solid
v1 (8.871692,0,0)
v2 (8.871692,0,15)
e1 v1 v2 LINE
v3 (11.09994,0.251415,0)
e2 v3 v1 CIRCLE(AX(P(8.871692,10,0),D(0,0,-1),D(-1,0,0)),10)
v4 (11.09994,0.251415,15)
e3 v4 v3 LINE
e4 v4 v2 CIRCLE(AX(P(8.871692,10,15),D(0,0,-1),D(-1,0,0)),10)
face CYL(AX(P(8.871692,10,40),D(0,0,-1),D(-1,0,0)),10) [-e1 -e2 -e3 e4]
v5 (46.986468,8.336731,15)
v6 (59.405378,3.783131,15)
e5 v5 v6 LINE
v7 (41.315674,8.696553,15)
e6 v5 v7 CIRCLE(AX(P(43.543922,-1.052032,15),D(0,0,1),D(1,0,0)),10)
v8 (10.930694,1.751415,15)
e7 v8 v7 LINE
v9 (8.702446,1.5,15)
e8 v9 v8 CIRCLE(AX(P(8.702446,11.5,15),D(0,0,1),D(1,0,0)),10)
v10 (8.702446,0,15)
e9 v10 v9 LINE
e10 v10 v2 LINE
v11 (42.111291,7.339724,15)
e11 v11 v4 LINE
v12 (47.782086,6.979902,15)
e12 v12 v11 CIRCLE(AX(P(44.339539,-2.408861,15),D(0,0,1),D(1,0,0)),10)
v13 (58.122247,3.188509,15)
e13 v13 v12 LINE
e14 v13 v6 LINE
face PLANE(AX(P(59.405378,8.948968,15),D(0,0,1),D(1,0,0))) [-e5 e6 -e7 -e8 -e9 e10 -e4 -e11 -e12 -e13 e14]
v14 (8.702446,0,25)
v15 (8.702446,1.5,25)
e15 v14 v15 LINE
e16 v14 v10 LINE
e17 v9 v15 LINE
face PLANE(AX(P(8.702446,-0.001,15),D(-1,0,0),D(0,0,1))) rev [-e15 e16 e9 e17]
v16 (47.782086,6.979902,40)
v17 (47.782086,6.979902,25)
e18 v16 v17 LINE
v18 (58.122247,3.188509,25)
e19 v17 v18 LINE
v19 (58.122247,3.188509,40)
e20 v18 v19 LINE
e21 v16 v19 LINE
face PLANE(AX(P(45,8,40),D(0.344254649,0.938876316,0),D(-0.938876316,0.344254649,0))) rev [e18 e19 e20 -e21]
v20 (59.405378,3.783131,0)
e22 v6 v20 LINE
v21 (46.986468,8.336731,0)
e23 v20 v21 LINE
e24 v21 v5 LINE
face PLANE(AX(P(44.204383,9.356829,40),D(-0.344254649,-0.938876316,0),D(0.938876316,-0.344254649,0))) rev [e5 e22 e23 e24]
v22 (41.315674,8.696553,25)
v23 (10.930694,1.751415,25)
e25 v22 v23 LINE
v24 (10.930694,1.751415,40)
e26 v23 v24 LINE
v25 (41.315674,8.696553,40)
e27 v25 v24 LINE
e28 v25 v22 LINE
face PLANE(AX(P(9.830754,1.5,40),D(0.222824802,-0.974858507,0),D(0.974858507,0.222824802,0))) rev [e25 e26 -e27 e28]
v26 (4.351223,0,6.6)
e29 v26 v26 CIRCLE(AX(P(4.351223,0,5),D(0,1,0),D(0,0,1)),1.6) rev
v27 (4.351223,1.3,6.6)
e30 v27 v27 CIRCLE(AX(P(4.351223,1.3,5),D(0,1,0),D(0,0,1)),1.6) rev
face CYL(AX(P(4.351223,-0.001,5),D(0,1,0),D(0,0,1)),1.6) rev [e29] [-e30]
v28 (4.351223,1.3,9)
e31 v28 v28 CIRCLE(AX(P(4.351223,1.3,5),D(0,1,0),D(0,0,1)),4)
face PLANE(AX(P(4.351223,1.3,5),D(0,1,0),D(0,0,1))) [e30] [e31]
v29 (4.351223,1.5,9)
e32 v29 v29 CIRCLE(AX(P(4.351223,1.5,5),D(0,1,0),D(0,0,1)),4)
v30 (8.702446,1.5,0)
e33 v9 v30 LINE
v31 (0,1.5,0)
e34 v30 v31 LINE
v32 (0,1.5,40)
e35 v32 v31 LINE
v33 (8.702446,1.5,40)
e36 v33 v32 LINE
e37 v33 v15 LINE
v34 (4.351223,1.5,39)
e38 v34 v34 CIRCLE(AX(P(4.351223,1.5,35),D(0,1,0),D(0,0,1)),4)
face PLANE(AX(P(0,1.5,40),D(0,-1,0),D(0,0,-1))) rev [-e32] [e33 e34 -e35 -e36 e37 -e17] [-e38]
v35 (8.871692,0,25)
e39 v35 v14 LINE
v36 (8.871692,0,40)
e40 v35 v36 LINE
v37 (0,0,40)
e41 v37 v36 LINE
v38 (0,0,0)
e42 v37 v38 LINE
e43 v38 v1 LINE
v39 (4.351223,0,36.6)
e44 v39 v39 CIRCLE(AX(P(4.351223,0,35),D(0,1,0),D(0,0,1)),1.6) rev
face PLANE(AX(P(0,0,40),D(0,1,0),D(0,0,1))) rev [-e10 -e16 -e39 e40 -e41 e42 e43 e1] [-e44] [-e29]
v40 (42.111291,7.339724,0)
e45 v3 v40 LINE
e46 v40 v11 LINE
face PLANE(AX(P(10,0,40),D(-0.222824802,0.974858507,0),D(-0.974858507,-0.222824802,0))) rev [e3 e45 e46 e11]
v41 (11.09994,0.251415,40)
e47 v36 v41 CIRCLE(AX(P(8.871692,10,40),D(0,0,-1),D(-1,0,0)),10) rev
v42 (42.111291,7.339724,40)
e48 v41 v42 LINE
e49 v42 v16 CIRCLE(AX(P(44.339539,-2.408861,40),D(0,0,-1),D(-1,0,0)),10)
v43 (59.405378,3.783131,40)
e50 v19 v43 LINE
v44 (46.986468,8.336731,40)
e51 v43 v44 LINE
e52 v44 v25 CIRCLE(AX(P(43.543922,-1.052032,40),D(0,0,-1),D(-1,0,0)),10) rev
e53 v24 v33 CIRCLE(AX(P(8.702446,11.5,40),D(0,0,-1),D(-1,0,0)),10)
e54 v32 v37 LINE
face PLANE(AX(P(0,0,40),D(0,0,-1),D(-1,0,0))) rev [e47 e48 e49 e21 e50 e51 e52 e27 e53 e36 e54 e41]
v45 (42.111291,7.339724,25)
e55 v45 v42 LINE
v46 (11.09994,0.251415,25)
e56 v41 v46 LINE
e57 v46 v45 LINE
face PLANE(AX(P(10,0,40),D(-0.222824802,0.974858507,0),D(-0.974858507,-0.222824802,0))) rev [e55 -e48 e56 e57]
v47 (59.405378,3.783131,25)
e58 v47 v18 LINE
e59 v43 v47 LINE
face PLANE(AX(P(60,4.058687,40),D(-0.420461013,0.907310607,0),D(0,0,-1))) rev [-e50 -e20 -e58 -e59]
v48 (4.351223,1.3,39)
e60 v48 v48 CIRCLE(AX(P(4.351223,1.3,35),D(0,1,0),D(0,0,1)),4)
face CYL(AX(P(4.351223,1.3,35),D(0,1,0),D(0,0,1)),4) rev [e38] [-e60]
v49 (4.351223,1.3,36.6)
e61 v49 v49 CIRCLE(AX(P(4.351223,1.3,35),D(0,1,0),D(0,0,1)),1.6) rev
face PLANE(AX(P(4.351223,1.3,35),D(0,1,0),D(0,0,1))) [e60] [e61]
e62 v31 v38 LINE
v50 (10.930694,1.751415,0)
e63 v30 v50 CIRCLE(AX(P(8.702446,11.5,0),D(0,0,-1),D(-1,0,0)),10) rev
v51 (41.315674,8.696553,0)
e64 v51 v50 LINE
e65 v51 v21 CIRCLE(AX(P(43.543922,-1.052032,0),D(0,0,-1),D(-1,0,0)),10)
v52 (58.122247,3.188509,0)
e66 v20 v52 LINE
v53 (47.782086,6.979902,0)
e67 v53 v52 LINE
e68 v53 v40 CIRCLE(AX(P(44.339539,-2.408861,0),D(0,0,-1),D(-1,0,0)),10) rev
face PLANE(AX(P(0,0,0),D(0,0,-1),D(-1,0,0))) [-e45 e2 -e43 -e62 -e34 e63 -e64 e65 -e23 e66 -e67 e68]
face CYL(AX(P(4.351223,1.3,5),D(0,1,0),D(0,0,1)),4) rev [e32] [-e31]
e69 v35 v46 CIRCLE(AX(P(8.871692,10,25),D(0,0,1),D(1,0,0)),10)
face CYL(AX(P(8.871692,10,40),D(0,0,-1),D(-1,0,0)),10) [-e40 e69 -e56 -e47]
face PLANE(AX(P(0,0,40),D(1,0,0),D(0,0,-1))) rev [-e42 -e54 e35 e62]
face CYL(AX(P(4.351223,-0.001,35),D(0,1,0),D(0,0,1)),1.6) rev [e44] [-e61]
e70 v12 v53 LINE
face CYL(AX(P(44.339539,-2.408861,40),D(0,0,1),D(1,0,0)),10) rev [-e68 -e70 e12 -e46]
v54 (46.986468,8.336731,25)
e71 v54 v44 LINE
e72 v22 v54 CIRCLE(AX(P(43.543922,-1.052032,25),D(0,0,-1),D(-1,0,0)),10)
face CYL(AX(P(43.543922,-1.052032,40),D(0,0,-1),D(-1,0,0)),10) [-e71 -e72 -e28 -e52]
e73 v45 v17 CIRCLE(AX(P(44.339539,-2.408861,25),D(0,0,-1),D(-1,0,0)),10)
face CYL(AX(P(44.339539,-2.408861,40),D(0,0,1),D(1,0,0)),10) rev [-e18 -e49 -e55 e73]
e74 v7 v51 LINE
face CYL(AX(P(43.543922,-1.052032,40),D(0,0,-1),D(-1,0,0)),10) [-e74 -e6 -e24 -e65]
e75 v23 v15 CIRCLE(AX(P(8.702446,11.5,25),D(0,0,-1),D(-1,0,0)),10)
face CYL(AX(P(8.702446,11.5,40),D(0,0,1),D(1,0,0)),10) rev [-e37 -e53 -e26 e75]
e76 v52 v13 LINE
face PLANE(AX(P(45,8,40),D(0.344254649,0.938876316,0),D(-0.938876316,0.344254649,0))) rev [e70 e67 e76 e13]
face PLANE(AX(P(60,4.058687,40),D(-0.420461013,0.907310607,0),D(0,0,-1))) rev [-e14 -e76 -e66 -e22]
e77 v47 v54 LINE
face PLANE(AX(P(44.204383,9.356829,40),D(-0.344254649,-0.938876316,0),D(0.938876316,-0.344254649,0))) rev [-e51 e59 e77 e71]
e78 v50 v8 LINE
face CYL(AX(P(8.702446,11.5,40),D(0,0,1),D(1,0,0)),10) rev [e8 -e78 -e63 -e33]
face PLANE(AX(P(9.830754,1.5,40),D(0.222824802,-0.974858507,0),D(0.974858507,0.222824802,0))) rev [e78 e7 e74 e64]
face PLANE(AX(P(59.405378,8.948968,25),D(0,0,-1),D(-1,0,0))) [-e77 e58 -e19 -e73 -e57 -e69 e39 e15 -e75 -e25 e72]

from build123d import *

# Parameters (mm, degrees)
EXTRUDE_1_DEPTH                 = 40
FILLET_1_R                      = 10
CHAMFER_1_SIZE                  = 2
CHAMFER_1_SIZE_2                = 1.558687347
CUT_EXTRUDE_1_REACH             = 74.003
SKETCH_2_R                      = 1.6
SKETCH_3_R                      = 4
CUT_EXTRUDE_2_DEPTH             = 0.2
CUT_EXTRUDE_3_REACH             = 74.003
SKETCH_4_W                      = 50.702932162
SKETCH_4_H                      = 10
CUT_EXTRUDE_3_DIRECTION_2_REACH = 74.003


with BuildPart() as part:
    # 草图1 → 凸台-拉伸1 (new body)
    with BuildSketch(Plane.XY):
        Polygon((0, 0), (10, 0), (45, 8), (60, 2.5), (60, 3.565103021), (44.204382552, 9.356829418), (9.830753848, 1.5), (0, 1.5), align=None)
    extrude(amount=EXTRUDE_1_DEPTH)

    # 圆角1
    fillet_1_edges = [part.edges().sort_by_distance(p)[0] for p in [
        (9.830753848, 1.5, 20),
        (44.204382552, 9.356829418, 20),
        (45, 8, 20),
        (10, 0, 20),
    ]]
    fillet(fillet_1_edges, radius=FILLET_1_R)

    # 倒角1
    # the kernel refuses this chamfer: 2, 1.558687347 mm, written as the material it takes off along each edge
    with BuildSketch(Plane(origin=(60, 2.5, -5.143365976), x_dir=(-0.9479869259850683, 0.31830926496314954, 0), z_dir=(0, 0, 1))) as chamfer_1_piece_1:
        Polygon((CHAMFER_1_SIZE * 0.999621916911, -CHAMFER_1_SIZE * 0.0274958766106), (CHAMFER_1_SIZE_2 * 0.318309265001, -CHAMFER_1_SIZE_2 * 0.947986926099), (0, 0), align=None)
    extrude(amount=50.286731952, mode=Mode.SUBTRACT)

    # 草图2 → 切除-拉伸1 (cut, up to next)
    with BuildSketch(Plane(origin=(0, 1.5, 0), x_dir=(1, 0, 0), z_dir=(0, 1, 0)), mode=Mode.PRIVATE) as cut_extrude_1_sk1:
        with Locations(Location((4.351223085, -5, 0), (0, 0, 270))):
            Circle(SKETCH_2_R)
    cut_extrude_1_tool1 = extrude(cut_extrude_1_sk1.sketch, amount=-CUT_EXTRUDE_1_REACH, mode=Mode.PRIVATE) & part.part
    # 草图2 → 切除-拉伸1 (cut, up to next)
    with BuildSketch(Plane(origin=(0, 1.5, 0), x_dir=(1, 0, 0), z_dir=(0, 1, 0)), mode=Mode.PRIVATE) as cut_extrude_1_sk2:
        with Locations(Location((4.351223085, -35, 0), (0, 0, 270))):
            Circle(SKETCH_2_R)
    cut_extrude_1_tool2 = extrude(cut_extrude_1_sk2.sketch, amount=-CUT_EXTRUDE_1_REACH, mode=Mode.PRIVATE) & part.part
    add(cut_extrude_1_tool1.solids().sort_by_distance((4.351223, 1.5, 5))[0], mode=Mode.SUBTRACT)
    add(cut_extrude_1_tool2.solids().sort_by_distance((4.351223, 1.5, 35))[0], mode=Mode.SUBTRACT)

    # 草图3 → 切除-拉伸2 (cut)
    with BuildSketch(Plane(origin=(0, 1.5, 0), x_dir=(1, 0, 0), z_dir=(0, 1, 0))):
        with Locations(Location((4.351223085, -5, 0), (0, 0, 270))):
            Circle(SKETCH_3_R)
        with Locations(Location((4.351223085, -35, 0), (0, 0, 270))):
            Circle(SKETCH_3_R)
    extrude(amount=-CUT_EXTRUDE_2_DEPTH, mode=Mode.SUBTRACT)

    # 草图4 → 切除-拉伸3 (cut, up to next)
    with BuildSketch(Plane(origin=(0, 1.5, 0), x_dir=(1, 0, 0), z_dir=(0, 1, 0)), mode=Mode.PRIVATE) as cut_extrude_3_sk1:
        with Locations((34.053912252, -20)):
            Rectangle(SKETCH_4_W, SKETCH_4_H)
    cut_extrude_3_tool1 = extrude(cut_extrude_3_sk1.sketch, amount=-CUT_EXTRUDE_3_REACH, mode=Mode.PRIVATE) & part.part
    add(cut_extrude_3_tool1.solids().sort_by_distance((34.053912, 1.5, 20))[0], mode=Mode.SUBTRACT)

    # 草图4 → 切除-拉伸3 direction 2 (cut, up to next)
    with BuildSketch(Plane(origin=(0, 1.5, 0), x_dir=(1, 0, 0), z_dir=(0, 1, 0)), mode=Mode.PRIVATE) as cut_extrude_3_direction_2_sk1:
        with Locations((34.053912252, -20)):
            Rectangle(SKETCH_4_W, SKETCH_4_H)
    cut_extrude_3_direction_2_tool1 = extrude(cut_extrude_3_direction_2_sk1.sketch, amount=CUT_EXTRUDE_3_DIRECTION_2_REACH, mode=Mode.PRIVATE) & part.part
    add(cut_extrude_3_direction_2_tool1.solids().sort_by_distance((34.053912, 1.5, 20))[0], mode=Mode.SUBTRACT)


solid = part.part
